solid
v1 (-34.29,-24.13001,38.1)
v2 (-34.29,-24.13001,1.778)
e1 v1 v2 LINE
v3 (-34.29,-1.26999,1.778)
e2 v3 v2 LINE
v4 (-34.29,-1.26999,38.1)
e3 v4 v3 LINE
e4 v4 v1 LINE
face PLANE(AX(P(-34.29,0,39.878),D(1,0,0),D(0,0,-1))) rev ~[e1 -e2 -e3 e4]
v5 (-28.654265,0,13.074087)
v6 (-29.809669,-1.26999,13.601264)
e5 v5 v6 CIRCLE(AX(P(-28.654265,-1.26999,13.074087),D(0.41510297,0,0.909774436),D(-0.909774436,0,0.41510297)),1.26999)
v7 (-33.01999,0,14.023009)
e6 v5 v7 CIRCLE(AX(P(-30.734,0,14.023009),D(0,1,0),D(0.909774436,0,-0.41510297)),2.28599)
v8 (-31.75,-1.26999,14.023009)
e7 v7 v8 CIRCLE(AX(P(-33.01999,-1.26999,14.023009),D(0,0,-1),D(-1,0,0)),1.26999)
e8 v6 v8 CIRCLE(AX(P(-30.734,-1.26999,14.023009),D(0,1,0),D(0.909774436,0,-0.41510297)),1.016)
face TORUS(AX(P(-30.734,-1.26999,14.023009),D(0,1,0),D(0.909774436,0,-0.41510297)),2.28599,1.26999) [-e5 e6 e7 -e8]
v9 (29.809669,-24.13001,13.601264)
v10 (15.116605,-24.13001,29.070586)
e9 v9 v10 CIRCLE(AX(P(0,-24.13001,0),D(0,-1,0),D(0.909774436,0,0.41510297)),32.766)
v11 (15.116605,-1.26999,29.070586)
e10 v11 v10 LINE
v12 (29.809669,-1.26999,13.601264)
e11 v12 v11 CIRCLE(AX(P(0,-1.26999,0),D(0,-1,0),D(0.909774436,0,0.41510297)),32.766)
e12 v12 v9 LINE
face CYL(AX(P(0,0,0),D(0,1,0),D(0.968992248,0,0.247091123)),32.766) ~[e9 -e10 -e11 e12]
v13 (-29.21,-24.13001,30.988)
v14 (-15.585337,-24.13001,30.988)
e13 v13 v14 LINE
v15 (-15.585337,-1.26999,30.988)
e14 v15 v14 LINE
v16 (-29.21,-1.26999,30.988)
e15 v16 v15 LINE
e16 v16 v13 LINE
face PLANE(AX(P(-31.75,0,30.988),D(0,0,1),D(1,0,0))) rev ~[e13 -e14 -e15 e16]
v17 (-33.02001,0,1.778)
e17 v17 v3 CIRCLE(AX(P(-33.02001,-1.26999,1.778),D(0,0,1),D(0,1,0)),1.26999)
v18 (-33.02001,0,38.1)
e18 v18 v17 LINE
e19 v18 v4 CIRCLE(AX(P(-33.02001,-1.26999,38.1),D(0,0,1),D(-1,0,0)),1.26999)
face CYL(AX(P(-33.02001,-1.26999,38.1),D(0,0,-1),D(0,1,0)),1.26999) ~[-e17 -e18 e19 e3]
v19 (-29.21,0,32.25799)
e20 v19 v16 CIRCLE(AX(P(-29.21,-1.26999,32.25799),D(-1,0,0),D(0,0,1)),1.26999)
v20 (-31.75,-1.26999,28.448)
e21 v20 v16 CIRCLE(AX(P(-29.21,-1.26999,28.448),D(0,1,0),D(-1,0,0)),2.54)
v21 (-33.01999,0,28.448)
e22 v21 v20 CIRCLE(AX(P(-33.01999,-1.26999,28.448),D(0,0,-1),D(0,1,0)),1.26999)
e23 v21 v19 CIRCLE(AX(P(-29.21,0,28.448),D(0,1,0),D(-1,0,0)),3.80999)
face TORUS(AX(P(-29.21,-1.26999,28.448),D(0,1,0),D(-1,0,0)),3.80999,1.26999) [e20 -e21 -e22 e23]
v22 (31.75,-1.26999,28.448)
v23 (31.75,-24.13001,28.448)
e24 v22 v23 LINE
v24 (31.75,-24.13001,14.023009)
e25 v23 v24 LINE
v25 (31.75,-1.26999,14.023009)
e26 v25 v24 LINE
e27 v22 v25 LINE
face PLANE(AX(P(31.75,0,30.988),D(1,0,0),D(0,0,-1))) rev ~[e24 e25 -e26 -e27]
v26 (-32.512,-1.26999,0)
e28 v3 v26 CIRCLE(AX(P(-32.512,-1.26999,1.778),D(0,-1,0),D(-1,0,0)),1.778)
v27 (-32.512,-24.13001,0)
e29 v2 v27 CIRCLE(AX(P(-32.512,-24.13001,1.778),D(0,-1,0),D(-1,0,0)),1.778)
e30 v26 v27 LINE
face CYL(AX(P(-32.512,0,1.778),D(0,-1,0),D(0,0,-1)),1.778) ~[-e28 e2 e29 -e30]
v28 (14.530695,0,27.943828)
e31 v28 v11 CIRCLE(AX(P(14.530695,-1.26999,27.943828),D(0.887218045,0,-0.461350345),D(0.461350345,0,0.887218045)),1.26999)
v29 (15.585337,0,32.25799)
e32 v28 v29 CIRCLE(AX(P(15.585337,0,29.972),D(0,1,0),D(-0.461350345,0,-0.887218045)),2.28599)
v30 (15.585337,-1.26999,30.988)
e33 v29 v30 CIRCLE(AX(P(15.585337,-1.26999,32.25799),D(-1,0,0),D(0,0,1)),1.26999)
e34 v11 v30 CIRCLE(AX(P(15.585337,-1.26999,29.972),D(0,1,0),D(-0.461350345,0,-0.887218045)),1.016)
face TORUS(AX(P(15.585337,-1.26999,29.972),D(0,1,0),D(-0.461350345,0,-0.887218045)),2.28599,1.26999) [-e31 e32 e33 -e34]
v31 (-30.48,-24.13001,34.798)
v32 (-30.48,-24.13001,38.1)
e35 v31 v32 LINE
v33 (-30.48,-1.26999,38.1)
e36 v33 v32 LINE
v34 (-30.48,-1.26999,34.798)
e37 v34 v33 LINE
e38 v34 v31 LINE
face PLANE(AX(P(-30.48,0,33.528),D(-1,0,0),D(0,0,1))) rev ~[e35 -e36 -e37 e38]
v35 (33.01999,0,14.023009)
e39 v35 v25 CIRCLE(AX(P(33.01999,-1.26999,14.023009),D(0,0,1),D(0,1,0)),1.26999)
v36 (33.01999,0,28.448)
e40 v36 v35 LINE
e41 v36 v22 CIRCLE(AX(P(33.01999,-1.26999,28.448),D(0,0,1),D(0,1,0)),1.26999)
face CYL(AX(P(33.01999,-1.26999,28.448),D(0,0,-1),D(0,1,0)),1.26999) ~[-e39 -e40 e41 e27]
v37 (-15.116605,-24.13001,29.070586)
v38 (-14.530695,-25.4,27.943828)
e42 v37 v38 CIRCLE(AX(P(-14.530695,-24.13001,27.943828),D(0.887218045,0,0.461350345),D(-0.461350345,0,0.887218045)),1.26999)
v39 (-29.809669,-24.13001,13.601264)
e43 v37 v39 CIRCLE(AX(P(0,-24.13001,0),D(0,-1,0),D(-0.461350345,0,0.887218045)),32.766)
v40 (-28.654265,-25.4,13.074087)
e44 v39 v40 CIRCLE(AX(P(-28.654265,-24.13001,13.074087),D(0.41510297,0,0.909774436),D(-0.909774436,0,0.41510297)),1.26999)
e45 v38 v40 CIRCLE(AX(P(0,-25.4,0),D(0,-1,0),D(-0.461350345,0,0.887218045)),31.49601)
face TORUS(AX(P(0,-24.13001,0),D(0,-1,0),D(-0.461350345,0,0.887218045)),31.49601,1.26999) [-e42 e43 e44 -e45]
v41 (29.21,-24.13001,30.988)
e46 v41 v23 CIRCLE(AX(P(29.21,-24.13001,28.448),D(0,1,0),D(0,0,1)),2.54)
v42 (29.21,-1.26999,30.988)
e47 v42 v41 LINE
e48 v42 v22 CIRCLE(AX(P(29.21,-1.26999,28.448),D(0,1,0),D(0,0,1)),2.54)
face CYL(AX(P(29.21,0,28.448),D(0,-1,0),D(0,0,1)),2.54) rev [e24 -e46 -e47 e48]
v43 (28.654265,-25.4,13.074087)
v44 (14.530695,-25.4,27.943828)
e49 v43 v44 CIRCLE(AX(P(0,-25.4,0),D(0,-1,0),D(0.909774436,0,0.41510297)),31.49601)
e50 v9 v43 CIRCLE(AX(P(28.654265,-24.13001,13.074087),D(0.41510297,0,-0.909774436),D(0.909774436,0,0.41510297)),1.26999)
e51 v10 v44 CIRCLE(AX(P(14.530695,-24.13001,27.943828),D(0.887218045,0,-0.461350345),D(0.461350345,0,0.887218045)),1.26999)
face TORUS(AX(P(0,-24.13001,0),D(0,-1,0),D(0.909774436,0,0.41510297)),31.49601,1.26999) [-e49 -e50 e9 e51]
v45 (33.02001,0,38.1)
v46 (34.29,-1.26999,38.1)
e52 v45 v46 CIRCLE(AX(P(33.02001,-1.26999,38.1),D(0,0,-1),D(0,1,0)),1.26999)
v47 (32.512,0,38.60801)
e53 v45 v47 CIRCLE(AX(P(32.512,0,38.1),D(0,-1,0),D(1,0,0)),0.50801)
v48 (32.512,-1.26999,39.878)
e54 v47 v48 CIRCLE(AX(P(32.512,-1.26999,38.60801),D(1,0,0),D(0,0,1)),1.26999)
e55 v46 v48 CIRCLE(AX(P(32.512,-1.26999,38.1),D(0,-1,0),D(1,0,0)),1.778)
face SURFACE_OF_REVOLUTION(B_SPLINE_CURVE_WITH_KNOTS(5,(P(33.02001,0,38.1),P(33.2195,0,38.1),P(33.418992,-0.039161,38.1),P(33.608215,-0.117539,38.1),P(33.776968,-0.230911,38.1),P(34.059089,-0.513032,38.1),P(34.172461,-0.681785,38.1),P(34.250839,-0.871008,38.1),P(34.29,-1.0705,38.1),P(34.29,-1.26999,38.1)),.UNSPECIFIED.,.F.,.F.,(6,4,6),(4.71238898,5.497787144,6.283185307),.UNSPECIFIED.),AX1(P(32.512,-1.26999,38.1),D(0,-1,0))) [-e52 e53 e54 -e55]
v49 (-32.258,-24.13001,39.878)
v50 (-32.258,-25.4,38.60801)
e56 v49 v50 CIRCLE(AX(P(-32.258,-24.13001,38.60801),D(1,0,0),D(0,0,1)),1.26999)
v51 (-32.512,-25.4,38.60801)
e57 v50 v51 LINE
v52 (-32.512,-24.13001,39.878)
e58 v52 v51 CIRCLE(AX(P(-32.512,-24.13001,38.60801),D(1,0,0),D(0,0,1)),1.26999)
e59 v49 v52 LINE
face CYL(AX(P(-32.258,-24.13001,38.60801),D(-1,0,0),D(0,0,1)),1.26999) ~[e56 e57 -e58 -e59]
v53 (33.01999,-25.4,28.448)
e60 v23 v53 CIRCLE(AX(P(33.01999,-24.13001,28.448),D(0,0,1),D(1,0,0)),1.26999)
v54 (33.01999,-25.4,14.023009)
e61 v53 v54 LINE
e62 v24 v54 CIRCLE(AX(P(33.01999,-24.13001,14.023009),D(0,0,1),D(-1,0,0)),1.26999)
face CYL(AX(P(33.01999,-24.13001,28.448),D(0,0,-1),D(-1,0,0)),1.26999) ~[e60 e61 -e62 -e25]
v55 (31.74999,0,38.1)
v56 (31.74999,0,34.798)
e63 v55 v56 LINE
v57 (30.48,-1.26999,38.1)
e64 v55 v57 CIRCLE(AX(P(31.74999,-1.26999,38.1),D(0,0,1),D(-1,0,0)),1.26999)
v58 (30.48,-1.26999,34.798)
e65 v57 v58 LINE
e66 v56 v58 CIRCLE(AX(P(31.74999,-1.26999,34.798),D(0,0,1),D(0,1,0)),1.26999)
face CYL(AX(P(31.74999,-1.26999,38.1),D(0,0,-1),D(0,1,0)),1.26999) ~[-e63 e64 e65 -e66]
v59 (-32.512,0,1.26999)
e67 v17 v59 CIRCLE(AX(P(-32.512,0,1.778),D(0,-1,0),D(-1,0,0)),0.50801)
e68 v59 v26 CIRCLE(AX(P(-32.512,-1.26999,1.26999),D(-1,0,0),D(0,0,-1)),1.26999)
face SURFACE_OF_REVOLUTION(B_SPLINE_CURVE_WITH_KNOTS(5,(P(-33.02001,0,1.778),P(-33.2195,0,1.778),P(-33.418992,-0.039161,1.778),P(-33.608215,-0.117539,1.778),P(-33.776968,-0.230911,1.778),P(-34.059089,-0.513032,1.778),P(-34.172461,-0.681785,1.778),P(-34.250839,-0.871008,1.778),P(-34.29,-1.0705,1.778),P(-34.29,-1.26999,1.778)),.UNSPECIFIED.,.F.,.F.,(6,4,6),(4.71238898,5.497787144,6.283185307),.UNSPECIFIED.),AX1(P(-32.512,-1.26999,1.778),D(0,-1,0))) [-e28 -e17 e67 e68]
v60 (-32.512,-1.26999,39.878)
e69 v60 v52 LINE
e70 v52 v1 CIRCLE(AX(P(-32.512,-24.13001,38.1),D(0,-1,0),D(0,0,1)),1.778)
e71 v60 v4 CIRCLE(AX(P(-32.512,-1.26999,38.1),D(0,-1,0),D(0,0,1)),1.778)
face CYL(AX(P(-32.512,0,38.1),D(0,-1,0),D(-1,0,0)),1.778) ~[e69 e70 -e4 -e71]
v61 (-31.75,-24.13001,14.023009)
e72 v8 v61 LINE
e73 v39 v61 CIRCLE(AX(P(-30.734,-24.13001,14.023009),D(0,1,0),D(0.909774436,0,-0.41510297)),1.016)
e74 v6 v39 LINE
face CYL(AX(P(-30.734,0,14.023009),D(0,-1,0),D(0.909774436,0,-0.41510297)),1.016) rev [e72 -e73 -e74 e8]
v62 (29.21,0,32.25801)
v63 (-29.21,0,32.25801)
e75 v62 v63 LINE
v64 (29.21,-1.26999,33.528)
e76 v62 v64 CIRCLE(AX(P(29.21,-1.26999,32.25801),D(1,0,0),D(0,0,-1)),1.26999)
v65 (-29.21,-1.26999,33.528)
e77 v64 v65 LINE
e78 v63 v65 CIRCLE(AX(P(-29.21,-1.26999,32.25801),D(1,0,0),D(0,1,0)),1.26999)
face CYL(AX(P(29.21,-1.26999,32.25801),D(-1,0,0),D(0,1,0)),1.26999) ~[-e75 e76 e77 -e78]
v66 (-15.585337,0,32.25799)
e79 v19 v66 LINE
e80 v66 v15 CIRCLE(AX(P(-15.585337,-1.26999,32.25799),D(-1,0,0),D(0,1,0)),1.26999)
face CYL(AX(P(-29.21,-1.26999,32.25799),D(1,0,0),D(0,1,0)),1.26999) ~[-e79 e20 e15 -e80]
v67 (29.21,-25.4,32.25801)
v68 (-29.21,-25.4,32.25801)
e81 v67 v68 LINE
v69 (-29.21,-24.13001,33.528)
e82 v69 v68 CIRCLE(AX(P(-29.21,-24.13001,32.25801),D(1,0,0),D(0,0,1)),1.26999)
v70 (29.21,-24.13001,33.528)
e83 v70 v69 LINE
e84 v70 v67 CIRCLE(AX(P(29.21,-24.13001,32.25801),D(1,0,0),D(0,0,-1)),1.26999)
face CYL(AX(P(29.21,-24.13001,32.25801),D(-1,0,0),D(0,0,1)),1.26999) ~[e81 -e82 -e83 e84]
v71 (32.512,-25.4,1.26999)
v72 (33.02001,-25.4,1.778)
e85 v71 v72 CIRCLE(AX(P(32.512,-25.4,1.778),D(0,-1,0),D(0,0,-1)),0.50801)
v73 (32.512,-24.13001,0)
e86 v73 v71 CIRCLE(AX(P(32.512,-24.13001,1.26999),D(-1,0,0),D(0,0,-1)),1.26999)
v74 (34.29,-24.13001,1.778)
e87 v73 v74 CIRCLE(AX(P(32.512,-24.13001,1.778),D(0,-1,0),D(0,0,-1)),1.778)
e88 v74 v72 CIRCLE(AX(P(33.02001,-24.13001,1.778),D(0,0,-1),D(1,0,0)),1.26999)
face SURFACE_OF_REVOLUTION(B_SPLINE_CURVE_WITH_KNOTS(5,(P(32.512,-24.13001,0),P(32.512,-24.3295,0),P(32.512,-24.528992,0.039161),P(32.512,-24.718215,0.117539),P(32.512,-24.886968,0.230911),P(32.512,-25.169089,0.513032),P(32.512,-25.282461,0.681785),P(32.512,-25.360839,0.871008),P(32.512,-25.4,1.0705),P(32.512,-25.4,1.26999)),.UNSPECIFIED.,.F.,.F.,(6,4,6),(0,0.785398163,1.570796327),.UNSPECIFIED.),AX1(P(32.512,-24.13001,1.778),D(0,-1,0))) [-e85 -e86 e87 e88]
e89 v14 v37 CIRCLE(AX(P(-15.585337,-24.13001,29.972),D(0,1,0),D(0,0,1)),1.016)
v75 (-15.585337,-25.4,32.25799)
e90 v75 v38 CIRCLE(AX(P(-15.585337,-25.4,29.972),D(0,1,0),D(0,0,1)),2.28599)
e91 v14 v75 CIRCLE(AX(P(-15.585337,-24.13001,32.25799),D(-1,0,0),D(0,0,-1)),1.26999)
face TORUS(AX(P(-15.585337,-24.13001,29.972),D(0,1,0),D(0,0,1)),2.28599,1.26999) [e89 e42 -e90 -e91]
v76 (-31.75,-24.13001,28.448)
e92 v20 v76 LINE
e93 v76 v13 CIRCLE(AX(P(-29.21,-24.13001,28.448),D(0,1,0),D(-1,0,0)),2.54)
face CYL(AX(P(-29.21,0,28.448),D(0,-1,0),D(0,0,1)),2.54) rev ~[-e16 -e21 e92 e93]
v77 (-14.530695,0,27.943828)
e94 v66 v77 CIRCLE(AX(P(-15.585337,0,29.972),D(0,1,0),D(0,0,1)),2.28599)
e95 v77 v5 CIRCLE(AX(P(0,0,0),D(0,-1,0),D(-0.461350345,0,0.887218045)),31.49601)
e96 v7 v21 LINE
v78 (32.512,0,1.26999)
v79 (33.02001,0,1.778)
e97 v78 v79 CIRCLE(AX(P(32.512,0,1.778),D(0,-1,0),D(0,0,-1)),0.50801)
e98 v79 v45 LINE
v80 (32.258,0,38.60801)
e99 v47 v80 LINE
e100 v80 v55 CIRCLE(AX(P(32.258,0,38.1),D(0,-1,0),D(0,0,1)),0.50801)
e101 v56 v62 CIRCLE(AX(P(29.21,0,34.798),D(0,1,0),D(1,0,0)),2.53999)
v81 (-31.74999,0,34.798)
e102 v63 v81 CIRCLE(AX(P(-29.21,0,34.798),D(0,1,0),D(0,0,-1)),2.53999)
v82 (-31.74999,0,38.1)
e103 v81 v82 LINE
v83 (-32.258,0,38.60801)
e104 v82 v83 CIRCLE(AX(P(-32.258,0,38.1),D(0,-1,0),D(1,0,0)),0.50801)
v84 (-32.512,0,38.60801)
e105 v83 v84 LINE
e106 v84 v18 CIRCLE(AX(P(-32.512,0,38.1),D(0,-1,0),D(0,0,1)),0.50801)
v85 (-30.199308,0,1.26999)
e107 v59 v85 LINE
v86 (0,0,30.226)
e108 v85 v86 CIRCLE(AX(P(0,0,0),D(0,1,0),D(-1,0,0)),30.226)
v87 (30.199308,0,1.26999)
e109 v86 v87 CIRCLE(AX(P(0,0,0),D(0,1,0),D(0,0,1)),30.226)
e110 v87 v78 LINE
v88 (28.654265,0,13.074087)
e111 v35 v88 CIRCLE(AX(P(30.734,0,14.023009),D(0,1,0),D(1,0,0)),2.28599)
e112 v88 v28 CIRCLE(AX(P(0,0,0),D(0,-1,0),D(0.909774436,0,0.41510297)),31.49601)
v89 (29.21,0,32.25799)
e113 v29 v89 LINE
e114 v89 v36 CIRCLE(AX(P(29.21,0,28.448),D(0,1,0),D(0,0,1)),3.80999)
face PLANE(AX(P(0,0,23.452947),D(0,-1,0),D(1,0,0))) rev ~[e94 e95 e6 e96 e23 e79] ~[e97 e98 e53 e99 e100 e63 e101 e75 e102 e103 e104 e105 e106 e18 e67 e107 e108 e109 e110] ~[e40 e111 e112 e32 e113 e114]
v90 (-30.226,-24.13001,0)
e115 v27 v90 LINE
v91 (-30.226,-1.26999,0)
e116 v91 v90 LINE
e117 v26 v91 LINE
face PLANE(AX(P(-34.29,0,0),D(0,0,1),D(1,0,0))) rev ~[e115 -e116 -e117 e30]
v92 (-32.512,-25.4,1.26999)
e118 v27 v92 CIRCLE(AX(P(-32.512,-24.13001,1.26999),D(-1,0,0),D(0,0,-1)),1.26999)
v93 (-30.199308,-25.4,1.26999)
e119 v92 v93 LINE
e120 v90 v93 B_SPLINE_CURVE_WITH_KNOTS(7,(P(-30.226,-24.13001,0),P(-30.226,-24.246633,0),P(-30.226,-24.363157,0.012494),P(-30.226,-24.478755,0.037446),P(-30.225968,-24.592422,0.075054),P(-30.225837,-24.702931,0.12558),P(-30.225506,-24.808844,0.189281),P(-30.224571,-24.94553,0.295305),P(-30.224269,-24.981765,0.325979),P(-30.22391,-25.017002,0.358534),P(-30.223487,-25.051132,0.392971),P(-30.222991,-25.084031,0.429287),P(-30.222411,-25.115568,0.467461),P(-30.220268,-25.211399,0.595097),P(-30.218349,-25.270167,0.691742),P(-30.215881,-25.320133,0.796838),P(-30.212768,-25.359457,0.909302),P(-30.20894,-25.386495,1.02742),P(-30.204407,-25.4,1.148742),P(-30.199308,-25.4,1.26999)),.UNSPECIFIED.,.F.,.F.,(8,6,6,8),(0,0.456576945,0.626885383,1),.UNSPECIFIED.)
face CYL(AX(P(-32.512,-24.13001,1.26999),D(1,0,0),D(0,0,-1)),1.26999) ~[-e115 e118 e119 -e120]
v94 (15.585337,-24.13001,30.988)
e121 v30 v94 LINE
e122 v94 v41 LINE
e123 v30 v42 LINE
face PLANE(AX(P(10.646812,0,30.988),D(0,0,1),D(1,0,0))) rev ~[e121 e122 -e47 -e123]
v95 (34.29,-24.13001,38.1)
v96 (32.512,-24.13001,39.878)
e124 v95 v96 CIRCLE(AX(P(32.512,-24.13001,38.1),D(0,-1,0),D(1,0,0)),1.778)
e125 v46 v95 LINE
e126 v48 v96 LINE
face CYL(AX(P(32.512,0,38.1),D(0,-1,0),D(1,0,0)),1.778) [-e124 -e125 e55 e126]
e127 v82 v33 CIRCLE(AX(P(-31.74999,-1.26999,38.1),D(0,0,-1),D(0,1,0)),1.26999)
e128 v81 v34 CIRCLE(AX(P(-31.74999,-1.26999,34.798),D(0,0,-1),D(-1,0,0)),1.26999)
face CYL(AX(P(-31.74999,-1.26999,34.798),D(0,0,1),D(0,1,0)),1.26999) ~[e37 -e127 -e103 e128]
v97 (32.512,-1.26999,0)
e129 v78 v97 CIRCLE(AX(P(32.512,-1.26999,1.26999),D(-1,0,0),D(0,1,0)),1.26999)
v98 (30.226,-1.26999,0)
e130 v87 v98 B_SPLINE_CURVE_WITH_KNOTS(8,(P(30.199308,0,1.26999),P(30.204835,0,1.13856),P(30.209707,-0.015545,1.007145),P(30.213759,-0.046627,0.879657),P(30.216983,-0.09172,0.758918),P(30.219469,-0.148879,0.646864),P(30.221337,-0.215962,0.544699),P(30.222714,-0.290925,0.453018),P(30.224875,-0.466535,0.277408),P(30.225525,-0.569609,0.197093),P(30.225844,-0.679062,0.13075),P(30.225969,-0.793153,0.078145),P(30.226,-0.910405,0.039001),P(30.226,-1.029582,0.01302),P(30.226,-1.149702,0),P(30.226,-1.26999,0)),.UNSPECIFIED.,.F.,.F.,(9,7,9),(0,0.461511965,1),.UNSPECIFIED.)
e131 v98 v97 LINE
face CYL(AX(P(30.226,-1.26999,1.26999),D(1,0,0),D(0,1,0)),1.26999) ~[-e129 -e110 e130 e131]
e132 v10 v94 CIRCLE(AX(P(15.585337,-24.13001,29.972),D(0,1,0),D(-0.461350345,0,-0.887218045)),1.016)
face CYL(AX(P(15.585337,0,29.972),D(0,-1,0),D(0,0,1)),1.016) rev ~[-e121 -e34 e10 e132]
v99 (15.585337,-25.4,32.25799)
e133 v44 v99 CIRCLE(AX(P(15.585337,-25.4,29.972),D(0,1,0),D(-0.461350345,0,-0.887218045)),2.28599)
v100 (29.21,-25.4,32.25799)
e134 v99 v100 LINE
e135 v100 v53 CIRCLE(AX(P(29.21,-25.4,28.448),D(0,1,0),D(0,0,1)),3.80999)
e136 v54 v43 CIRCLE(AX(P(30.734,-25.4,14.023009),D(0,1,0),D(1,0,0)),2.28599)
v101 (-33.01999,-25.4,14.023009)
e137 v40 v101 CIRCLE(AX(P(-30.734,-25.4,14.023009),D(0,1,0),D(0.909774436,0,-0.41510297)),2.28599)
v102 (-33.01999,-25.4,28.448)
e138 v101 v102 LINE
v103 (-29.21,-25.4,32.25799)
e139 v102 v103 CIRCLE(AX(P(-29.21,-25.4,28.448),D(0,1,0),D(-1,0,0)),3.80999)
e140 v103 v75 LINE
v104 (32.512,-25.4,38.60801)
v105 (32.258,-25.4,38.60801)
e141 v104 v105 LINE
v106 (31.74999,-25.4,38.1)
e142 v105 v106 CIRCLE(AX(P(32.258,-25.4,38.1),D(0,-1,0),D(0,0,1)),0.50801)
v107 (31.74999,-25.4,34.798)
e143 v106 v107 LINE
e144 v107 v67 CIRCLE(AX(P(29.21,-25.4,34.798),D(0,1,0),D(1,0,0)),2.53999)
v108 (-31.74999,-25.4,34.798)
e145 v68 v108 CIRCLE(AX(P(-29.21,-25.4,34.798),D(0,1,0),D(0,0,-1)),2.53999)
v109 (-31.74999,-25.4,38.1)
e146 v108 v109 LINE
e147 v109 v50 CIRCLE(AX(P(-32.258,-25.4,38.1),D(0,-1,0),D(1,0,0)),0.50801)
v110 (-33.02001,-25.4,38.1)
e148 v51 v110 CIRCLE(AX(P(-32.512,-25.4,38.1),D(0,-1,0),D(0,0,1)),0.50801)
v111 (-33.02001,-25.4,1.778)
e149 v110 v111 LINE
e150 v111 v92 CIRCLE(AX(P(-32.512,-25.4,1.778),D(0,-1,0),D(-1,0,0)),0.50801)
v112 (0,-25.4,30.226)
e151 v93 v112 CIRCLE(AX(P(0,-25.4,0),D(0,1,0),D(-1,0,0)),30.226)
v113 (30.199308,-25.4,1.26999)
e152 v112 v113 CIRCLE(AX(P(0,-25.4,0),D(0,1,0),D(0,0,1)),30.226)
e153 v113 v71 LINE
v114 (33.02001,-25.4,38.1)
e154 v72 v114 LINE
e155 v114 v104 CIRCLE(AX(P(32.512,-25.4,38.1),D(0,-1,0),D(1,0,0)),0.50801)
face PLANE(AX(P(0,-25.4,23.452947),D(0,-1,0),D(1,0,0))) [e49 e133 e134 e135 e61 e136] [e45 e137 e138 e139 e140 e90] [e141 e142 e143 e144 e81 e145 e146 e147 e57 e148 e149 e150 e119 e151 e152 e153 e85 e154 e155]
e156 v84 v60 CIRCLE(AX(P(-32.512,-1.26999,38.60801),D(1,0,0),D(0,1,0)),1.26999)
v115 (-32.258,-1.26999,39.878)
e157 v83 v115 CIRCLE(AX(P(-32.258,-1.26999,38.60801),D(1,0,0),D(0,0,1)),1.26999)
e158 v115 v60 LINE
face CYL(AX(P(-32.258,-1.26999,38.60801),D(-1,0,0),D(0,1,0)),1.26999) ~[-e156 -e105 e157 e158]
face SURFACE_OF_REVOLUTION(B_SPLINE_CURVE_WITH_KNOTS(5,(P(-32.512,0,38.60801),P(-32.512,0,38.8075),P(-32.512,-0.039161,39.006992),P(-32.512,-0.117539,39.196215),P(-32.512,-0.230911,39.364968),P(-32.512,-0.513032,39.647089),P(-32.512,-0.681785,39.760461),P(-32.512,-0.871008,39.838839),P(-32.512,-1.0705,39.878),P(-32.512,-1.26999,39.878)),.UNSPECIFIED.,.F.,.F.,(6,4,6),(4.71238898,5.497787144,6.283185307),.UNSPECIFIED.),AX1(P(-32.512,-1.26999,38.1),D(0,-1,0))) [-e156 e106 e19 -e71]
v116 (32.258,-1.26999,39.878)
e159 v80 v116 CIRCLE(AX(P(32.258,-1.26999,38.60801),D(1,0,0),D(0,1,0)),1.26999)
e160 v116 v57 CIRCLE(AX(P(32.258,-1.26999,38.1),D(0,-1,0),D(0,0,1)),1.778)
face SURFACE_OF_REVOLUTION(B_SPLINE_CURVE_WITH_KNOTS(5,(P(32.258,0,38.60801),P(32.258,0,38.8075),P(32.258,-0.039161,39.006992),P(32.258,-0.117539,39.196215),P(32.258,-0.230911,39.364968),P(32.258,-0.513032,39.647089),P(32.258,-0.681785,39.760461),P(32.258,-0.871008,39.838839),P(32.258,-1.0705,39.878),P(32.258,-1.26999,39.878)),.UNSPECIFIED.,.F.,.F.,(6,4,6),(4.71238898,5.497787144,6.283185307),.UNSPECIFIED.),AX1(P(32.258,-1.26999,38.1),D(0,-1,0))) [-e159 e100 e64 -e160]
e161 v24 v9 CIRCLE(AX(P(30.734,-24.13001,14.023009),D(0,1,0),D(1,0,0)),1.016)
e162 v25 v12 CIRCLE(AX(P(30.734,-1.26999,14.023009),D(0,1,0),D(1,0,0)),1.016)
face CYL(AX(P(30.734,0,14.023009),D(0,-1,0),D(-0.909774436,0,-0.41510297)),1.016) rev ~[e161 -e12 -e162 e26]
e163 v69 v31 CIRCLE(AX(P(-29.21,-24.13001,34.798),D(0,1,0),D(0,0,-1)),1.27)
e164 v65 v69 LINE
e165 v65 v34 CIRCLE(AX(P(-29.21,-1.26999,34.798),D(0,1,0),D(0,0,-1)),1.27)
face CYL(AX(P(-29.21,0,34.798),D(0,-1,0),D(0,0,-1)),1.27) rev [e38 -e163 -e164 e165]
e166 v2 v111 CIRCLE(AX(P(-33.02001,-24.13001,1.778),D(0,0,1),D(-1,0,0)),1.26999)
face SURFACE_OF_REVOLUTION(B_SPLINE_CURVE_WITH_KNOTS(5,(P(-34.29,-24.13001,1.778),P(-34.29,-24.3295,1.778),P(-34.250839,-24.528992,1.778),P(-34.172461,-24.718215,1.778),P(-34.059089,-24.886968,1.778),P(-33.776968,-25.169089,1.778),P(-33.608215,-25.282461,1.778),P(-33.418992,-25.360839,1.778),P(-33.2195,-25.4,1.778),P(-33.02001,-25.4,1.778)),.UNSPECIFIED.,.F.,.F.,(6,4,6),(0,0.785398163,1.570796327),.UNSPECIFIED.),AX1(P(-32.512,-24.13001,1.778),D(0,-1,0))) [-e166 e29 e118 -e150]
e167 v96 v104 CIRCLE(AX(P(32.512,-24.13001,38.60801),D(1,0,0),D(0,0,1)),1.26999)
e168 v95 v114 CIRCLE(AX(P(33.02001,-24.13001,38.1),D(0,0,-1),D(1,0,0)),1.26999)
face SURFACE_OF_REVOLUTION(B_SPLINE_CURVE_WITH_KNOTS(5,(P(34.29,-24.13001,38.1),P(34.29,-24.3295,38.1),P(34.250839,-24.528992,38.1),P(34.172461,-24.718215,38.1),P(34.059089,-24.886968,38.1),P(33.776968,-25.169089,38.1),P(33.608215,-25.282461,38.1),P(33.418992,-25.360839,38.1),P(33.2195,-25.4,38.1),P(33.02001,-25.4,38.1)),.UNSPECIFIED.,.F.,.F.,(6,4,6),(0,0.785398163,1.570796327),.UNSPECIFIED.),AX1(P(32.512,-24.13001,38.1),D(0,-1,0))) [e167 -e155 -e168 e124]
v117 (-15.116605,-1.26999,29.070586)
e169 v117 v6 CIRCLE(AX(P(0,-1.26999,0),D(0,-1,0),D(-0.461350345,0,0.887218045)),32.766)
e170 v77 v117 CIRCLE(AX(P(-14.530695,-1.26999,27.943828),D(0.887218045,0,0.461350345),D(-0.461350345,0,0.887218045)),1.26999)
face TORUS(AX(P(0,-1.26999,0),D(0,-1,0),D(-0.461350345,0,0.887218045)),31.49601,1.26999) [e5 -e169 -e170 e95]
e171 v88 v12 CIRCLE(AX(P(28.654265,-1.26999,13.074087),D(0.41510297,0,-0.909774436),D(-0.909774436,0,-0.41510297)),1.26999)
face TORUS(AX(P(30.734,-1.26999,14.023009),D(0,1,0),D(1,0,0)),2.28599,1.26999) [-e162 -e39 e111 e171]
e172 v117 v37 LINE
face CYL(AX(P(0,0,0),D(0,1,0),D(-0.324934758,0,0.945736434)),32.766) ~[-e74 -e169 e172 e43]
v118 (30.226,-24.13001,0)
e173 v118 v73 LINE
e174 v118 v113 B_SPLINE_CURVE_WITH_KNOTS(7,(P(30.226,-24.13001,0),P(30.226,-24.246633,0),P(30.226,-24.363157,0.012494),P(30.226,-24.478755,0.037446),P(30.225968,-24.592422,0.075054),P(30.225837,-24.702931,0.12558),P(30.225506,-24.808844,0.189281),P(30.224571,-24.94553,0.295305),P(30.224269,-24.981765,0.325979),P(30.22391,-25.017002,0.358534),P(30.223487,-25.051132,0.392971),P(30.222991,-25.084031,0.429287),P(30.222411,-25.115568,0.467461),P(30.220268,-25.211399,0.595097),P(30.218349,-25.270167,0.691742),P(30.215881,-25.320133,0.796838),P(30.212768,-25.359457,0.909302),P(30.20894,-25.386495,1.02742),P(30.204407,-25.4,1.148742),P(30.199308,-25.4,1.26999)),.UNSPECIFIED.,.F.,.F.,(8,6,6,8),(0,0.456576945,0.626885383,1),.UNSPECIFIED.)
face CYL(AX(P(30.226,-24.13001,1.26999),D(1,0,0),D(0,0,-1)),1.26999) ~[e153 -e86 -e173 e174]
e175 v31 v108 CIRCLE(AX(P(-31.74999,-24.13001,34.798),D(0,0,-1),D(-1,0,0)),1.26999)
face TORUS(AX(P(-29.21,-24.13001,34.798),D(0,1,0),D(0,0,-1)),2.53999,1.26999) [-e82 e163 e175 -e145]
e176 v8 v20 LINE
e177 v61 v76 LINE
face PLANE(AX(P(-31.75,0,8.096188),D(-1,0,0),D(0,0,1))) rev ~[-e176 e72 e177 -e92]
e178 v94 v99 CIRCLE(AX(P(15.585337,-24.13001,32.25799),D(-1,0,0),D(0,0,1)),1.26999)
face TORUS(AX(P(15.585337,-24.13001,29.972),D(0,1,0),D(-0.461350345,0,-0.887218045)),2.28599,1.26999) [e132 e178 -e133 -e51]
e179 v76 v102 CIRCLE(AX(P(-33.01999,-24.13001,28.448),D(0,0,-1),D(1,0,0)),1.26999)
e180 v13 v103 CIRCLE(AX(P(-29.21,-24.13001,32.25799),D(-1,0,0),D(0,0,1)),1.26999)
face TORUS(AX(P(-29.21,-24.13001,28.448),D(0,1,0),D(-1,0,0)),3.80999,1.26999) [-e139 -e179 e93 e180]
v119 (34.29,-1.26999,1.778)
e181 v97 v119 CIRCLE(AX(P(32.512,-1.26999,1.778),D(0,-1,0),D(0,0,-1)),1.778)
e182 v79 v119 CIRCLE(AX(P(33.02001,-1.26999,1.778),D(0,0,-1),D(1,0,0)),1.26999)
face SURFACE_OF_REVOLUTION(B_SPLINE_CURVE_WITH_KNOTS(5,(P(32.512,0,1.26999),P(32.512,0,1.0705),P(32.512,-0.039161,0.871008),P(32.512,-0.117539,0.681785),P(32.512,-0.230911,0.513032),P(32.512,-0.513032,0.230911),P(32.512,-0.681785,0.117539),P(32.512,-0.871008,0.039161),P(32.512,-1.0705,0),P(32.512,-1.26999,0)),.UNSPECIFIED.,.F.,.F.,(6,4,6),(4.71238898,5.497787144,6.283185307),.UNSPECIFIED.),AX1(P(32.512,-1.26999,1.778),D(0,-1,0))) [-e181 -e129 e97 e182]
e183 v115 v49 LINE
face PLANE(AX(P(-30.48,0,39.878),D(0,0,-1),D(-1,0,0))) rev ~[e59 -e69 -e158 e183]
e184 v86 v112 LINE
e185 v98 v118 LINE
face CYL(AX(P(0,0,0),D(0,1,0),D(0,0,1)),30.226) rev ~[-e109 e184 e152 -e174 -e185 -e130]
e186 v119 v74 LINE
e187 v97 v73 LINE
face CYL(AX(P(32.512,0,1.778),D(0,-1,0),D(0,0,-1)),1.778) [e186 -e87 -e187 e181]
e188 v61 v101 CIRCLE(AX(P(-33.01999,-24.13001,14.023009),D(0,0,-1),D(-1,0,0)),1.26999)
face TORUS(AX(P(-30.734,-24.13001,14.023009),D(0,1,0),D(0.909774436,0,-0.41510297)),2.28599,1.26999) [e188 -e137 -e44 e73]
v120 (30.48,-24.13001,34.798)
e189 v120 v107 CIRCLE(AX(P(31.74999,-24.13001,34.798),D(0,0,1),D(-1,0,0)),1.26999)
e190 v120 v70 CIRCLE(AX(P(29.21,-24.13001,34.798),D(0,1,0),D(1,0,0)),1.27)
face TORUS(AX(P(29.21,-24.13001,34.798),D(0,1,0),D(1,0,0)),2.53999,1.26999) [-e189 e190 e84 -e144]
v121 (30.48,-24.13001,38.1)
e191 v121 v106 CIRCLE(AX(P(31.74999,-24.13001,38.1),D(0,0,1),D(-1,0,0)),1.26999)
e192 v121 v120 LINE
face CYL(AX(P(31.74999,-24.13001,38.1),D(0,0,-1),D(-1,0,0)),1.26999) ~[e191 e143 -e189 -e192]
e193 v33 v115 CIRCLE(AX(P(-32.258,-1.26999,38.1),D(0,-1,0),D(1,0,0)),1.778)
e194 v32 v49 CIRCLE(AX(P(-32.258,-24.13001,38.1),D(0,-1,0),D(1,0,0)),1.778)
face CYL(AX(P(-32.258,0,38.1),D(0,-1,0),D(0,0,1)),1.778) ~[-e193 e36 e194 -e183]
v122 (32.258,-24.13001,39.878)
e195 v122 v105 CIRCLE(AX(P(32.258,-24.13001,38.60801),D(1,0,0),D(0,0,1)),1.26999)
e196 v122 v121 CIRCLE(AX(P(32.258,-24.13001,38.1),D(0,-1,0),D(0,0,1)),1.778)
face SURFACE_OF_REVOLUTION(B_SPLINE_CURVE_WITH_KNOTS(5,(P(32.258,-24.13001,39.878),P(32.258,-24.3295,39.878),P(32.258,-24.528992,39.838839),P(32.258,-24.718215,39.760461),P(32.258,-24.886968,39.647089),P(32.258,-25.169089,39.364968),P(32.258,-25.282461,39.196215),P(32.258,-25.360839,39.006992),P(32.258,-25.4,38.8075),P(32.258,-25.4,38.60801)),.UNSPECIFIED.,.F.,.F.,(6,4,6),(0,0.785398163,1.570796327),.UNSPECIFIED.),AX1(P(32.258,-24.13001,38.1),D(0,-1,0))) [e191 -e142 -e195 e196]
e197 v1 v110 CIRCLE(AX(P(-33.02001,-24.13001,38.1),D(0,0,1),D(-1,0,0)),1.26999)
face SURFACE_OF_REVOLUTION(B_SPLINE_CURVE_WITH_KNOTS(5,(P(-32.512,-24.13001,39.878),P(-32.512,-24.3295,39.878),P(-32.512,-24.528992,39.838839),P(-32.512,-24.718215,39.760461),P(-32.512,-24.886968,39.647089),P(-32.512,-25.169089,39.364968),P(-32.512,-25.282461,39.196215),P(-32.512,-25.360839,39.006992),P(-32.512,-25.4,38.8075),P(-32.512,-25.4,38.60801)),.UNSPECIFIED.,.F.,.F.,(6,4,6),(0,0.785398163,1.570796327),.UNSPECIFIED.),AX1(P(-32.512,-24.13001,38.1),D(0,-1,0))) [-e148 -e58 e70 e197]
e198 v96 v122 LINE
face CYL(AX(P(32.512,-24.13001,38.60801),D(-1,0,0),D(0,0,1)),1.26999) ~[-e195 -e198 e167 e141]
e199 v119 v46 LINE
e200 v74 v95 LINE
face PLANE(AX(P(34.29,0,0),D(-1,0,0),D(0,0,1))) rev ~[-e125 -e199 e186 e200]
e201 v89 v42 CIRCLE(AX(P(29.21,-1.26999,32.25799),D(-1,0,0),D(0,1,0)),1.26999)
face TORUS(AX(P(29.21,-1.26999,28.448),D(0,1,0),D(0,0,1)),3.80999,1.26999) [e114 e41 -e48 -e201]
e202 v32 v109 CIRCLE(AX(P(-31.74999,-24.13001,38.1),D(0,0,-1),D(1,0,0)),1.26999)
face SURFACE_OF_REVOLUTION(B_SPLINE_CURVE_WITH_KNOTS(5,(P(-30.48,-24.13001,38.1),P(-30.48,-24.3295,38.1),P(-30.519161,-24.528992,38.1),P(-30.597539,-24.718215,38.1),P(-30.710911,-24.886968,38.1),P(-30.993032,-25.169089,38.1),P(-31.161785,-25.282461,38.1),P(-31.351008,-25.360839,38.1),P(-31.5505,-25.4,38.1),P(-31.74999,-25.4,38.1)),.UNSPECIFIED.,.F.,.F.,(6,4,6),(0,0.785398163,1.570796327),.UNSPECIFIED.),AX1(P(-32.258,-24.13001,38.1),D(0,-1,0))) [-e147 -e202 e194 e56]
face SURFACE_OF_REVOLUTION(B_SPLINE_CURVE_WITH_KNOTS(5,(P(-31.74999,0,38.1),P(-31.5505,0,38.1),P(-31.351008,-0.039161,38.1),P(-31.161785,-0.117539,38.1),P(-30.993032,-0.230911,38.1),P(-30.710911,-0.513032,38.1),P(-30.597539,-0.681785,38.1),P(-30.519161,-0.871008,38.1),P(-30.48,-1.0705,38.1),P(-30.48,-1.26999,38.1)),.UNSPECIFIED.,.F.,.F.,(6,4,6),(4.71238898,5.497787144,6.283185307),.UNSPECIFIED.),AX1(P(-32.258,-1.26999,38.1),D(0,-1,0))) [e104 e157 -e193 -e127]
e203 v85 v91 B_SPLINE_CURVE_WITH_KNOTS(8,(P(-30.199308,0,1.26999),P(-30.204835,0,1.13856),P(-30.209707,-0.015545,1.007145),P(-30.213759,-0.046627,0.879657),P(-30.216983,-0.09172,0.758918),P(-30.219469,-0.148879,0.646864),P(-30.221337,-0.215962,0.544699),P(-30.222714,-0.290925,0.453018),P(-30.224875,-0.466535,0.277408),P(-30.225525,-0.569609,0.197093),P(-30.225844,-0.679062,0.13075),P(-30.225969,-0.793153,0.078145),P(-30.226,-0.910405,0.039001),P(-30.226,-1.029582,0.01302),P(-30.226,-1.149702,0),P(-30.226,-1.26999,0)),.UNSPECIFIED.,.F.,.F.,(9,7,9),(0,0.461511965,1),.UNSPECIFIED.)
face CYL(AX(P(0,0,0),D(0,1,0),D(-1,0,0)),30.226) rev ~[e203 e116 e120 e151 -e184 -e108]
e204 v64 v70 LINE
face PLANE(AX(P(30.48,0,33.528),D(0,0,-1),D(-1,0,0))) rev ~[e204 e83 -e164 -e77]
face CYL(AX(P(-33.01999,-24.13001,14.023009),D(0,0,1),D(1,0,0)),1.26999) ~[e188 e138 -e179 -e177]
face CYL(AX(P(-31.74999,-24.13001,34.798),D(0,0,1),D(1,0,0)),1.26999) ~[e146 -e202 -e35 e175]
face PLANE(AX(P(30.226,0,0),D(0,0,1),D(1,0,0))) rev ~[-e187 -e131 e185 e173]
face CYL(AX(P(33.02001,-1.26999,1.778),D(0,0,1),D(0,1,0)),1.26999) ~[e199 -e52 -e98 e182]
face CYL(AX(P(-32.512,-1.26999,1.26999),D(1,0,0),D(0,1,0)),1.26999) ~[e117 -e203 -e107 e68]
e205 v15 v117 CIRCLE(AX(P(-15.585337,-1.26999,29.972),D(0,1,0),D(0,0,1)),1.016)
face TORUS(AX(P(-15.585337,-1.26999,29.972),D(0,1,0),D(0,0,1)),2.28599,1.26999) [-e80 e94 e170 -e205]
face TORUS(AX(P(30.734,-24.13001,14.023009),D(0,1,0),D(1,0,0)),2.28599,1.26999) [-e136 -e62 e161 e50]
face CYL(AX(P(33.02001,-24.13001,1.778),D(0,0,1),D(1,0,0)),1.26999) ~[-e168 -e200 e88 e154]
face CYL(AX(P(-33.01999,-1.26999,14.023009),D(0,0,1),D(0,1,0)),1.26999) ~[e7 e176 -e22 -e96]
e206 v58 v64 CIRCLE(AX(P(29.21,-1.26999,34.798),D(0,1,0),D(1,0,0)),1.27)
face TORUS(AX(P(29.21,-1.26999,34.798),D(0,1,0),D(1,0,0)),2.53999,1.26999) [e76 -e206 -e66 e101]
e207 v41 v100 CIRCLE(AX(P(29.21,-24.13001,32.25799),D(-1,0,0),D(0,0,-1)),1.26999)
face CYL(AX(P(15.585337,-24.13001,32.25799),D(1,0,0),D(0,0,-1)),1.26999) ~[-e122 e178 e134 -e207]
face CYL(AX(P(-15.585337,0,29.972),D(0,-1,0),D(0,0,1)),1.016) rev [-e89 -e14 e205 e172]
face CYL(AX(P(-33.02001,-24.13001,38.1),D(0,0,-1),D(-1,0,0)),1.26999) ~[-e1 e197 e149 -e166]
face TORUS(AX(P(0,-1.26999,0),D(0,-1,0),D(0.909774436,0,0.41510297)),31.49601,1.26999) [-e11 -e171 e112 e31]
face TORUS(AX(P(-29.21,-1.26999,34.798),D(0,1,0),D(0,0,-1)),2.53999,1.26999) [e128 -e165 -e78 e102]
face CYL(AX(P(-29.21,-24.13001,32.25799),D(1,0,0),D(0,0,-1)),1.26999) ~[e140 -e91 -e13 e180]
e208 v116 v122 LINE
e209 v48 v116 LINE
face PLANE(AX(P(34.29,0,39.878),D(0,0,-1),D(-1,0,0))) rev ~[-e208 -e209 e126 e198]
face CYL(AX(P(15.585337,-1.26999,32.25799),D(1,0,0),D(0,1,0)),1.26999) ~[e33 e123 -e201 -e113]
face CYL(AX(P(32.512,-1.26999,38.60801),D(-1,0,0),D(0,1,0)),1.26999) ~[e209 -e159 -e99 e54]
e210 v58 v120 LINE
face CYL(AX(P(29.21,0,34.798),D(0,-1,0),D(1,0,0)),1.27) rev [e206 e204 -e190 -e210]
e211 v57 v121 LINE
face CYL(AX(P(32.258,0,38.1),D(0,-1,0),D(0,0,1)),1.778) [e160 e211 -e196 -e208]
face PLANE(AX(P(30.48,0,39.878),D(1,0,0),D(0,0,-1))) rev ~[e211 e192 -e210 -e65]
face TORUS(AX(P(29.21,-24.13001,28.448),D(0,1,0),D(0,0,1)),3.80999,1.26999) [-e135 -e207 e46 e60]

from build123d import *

# Parameters (mm, degrees)
F1_DEPTH = 25.4
F2_R     = 1.778
F3_R     = 2.54
F4_R     = 1.016
F5_R     = 1.27
F6_R     = 1.26999


# Not quite as in the source:
# - a fillet or chamfer is up to 0.001 mm smaller than in the source, because OpenCascade refuses the exact size


with BuildPart() as f1:
    # F0 (on Front) → F1 (new body)
    with BuildSketch(Plane.XZ):
        with BuildLine():
            ThreePointArc((0, 30.226), (21.3730095681, 21.3730095681), (30.226, 0))
            Line((30.226, 0), (34.29, 0))
            Line((34.29, 0), (34.29, 39.878))
            Line((34.29, 39.878), (30.48, 39.878))
            Line((30.48, 39.878), (30.48, 33.528))
            Line((30.48, 33.528), (0, 33.528))
            Line((0, 33.528), (-30.48, 33.528))
            Line((-30.48, 33.528), (-30.48, 39.878))
            Line((-30.48, 39.878), (-34.29, 39.878))
            Line((-34.29, 39.878), (-34.29, 0))
            Line((-34.29, 0), (-30.226, 0))
            ThreePointArc((-30.226, 0), (-21.3730095681, 21.3730095681), (0, 30.226))
        make_face()
        with BuildLine():
            ThreePointArc((-10.6468122929, 30.988), (-24.0911018891, 22.2087722706), (-31.75, 8.0961877449))
            Line((-31.75, 8.0961877449), (-31.75, 30.988))
            Line((-31.75, 30.988), (-10.6468122929, 30.988))
        make_face(mode=Mode.SUBTRACT)
        with BuildLine():
            Line((31.75, 30.988), (31.75, 8.0961877449))
            ThreePointArc((31.75, 8.0961877449), (24.0911018891, 22.2087722706), (10.6468122929, 30.988))
            Line((10.6468122929, 30.988), (31.75, 30.988))
        make_face(mode=Mode.SUBTRACT)
    extrude(amount=F1_DEPTH)

    # F2
    f2_edges = [f1.edges().sort_by_distance(p)[0] for p in [
        (-30.48, -12.7, 39.878),
        (-34.29, -12.7, 39.878),
        (34.29, -12.7, 39.878),
        (30.48, -12.7, 39.878),
        (34.29, -12.7, 0),
        (-34.29, -12.7, 0),
    ]]
    fillet(f2_edges, radius=F2_R)

    # F3
    f3_edges = [f1.edges().sort_by_distance(p)[0] for p in [
        (-31.75, -12.7, 30.988),
        (31.75, -12.7, 30.988),
    ]]
    fillet(f3_edges, radius=F3_R)

    # F4
    f4_edges = [f1.edges().sort_by_distance(p)[0] for p in [
        (-10.646812, -12.7, 30.988),
        (-31.75, -12.7, 8.096188),
        (31.75, -12.7, 8.096188),
        (10.646812, -12.7, 30.988),
    ]]
    fillet(f4_edges, radius=F4_R)

    # F5
    f5_edges = [f1.edges().sort_by_distance(p)[0] for p in [
        (-30.48, -12.7, 33.528),
        (30.48, -12.7, 33.528),
    ]]
    fillet(f5_edges, radius=F5_R)

    # F6 (radius 1.27 in the source; OpenCascade refuses exactly that, so slightly less here)
    f6_edges = [f1.edges().sort_by_distance(p)[0] for p in [
        (-34.29, -25.4, 19.939),
        (-23.757473, -25.4, 22.56531),
        (23.757473, -25.4, 22.56531),
        (0, 0, 33.528),
        (31.75, 0, 21.235504),
        (-23.757473, 0, 22.56531),
    ]]
    fillet(f6_edges, radius=F6_R)


solid = f1.part
